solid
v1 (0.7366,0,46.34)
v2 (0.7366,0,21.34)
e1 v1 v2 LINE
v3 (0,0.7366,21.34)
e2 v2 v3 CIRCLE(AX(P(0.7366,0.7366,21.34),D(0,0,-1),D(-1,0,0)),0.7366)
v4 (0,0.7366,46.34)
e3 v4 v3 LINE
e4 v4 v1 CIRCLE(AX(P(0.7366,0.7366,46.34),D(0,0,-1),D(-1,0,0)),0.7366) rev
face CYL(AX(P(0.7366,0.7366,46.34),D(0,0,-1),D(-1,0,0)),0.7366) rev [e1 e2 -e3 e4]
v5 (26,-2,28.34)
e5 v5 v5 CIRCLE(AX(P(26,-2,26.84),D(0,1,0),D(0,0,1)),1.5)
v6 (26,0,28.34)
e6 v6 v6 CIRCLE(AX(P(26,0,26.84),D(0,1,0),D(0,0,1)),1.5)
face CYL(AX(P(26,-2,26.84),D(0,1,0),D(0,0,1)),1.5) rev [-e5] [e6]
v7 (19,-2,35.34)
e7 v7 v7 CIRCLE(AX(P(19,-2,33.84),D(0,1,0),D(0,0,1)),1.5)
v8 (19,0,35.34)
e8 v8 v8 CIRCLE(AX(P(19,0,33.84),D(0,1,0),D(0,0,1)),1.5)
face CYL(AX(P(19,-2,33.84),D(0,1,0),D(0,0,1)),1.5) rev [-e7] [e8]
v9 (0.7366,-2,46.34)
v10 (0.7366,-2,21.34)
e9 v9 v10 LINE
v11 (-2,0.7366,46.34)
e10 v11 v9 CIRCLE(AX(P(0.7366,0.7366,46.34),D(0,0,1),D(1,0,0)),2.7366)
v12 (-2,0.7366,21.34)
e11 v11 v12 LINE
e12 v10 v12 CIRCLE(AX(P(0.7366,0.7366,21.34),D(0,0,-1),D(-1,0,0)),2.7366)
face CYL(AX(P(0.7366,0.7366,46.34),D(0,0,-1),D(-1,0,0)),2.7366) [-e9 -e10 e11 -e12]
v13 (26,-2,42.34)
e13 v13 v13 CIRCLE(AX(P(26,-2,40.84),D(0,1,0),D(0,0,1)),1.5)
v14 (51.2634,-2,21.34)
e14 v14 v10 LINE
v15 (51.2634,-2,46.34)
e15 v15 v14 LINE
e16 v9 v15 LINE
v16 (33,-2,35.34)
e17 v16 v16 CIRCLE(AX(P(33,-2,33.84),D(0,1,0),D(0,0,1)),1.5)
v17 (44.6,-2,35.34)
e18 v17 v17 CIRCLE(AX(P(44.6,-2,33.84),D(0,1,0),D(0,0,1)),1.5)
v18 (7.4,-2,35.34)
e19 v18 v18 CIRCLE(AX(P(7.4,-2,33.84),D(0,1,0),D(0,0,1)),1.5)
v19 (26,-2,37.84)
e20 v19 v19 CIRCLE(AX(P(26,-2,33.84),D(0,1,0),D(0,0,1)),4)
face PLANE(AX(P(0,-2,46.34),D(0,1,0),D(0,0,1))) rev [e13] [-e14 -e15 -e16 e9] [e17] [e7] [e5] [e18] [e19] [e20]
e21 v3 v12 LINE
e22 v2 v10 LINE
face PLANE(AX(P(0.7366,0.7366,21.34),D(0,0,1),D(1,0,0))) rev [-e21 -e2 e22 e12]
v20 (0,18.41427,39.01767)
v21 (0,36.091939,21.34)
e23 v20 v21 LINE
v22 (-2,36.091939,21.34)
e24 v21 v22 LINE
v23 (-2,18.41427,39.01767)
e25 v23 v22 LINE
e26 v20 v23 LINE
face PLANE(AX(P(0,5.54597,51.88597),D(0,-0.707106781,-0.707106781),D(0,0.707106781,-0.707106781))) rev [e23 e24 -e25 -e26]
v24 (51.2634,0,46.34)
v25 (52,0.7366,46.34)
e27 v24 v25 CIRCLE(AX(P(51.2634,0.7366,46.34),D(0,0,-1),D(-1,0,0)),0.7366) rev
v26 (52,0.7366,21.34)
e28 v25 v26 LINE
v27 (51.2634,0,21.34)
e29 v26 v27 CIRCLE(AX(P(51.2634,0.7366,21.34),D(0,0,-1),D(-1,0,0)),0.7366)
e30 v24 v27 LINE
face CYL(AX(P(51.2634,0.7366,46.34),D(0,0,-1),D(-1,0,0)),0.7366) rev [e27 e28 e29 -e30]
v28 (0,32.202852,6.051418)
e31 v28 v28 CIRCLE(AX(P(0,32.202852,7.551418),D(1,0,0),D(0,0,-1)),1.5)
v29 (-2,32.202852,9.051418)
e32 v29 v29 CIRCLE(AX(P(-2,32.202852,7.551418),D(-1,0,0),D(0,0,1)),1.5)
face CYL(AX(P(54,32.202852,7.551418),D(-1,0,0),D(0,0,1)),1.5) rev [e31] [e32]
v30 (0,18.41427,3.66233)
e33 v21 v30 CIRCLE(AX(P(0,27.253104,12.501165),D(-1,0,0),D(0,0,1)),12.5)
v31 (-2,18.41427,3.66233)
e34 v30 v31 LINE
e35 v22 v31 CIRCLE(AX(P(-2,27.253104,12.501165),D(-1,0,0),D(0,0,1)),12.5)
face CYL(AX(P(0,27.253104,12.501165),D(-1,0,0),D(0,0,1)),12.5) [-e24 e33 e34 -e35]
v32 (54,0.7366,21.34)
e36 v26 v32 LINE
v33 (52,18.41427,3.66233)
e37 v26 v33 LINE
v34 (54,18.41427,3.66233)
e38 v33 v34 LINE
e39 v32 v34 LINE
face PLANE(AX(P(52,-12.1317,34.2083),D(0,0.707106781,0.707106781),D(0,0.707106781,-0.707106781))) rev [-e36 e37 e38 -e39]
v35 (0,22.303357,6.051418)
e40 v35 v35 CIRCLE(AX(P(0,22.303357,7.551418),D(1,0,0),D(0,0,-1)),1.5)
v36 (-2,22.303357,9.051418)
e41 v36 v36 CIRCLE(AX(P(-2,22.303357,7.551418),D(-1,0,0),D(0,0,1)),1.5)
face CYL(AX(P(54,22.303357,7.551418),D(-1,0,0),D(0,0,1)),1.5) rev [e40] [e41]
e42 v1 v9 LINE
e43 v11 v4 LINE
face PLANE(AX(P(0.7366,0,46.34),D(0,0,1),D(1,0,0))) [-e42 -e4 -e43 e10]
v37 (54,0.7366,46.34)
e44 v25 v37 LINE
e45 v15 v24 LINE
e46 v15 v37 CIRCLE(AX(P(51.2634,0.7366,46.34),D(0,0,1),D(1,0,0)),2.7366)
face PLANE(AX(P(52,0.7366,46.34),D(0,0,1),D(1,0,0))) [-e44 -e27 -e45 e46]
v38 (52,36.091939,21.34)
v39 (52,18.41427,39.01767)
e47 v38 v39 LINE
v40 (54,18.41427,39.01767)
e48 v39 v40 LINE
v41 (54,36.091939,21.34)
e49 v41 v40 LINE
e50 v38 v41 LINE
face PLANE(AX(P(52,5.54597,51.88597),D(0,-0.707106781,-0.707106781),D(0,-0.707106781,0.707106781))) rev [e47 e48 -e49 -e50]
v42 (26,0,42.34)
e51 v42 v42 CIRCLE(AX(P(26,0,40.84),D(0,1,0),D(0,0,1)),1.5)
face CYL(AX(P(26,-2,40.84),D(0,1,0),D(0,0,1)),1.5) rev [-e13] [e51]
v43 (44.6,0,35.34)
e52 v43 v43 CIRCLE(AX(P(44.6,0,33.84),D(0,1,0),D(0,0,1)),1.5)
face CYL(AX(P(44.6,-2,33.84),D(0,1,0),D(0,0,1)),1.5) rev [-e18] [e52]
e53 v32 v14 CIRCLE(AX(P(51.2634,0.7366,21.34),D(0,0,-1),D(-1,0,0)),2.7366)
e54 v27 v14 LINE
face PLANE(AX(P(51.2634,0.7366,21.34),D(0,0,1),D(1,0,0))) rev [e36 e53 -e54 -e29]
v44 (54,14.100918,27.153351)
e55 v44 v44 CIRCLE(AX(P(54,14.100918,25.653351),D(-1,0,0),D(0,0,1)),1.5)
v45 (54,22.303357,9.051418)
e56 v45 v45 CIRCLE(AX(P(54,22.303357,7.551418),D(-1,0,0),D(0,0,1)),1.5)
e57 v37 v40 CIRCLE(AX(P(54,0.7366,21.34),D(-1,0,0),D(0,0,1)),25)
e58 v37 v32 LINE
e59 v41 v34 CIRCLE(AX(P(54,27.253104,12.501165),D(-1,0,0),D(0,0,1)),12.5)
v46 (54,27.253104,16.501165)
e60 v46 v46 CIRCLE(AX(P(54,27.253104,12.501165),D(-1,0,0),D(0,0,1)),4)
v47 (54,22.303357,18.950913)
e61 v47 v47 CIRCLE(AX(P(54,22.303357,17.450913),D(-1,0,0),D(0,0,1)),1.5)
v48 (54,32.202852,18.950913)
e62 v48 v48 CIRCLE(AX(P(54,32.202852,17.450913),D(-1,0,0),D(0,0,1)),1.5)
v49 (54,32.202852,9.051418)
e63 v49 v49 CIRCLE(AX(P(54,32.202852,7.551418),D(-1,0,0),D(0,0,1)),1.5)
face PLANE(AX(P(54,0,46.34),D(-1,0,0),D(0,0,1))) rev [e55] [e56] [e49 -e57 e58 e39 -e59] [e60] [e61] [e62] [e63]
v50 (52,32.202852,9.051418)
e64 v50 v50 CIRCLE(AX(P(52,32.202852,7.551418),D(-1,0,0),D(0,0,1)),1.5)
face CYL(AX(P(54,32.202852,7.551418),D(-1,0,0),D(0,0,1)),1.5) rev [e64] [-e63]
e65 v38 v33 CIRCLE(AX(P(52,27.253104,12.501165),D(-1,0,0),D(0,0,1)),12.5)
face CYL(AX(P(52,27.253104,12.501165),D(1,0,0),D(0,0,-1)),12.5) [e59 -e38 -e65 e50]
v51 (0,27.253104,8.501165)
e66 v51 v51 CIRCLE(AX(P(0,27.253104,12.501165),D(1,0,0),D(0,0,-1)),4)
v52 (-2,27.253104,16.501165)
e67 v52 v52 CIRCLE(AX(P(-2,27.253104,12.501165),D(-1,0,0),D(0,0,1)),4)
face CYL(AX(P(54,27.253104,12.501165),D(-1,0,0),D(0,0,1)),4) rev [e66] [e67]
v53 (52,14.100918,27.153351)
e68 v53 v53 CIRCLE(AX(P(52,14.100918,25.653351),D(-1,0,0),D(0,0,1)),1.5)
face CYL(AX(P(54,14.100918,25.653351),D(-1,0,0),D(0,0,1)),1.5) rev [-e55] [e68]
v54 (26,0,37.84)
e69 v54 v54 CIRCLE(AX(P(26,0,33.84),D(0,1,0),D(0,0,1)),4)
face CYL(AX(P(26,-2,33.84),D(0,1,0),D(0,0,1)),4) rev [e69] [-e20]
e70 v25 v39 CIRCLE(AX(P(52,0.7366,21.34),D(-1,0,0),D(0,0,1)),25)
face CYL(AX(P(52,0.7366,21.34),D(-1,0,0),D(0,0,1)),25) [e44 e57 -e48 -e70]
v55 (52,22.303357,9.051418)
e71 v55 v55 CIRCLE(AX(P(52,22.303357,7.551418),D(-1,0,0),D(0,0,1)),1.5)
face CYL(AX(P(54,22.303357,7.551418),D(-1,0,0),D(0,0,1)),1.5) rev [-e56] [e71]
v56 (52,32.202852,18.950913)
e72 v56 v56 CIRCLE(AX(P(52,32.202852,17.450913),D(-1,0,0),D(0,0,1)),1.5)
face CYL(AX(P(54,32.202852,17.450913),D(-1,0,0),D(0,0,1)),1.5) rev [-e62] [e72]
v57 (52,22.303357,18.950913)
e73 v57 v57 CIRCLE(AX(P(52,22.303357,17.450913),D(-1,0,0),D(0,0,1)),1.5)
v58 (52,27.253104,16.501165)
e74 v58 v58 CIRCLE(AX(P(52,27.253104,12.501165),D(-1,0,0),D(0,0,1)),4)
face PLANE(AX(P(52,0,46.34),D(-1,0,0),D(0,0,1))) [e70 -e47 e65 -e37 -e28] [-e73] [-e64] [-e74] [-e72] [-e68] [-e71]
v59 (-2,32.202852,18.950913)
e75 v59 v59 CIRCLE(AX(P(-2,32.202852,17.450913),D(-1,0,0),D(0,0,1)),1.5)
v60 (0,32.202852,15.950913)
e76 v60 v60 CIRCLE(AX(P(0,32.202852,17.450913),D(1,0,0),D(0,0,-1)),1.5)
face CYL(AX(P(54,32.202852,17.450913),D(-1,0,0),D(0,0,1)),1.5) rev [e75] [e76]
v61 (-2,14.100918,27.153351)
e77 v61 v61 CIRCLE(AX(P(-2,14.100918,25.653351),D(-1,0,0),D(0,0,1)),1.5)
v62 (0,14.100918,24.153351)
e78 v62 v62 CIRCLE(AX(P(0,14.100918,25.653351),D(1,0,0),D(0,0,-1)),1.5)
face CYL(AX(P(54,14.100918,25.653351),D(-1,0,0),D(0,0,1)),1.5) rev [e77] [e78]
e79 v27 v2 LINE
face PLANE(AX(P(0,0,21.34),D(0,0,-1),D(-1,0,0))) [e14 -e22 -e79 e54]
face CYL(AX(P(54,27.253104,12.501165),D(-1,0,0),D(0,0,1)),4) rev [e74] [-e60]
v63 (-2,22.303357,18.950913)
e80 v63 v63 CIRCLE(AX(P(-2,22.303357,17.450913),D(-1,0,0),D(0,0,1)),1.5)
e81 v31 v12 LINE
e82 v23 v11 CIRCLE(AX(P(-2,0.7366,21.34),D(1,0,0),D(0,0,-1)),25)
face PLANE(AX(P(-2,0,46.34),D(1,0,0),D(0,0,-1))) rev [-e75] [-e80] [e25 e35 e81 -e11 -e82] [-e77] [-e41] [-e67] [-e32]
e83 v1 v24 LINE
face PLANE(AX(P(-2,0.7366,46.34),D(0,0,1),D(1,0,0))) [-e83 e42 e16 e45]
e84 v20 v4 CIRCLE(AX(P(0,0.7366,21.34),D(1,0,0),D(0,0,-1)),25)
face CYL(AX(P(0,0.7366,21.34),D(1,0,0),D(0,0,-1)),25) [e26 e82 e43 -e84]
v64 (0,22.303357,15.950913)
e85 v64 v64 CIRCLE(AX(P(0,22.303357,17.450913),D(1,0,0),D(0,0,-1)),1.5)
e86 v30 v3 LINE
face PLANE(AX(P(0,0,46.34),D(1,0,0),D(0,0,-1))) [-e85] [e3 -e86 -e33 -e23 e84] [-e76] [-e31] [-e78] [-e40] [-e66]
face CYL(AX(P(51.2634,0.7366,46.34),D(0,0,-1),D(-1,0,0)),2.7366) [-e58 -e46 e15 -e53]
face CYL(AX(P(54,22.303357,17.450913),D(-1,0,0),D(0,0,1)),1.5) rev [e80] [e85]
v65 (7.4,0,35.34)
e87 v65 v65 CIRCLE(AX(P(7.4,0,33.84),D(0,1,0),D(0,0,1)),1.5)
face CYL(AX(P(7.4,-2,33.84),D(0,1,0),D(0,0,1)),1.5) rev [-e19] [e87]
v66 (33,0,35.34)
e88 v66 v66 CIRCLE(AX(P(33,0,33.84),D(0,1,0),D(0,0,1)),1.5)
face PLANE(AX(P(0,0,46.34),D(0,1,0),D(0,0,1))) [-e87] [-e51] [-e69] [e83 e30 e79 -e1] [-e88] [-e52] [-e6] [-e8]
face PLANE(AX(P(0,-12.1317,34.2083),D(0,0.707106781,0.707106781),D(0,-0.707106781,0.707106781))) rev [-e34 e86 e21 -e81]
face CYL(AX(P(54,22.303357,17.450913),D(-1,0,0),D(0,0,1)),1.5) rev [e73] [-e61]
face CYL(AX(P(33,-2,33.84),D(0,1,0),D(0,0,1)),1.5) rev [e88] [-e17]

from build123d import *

# Parameters (mm, degrees)
SM_BASE_FLANGE_1_DEPTH   = 46.34
CUT_EXTRUDE_1_DEPTH      = 83.488760446
EXTRUDE_1_DEPTH          = 2
CUT_EXTRUDE_2_DEPTH      = 82.508925285
CUT_EXTRUDE_2_DEPTH_BACK = 82.508925285
SKETCH_9_R               = 4
SKETCH_9_R_2             = 1.5
SKETCH_10_R              = 4
SKETCH_10_R_2            = 1.5
CUT_EXTRUDE_3_DEPTH      = 2


# Sheet-metal steps are written as plain solids
with BuildPart() as part:
    # Sketch 1 → 基体-法兰1 (new body)
    with BuildSketch(Plane.XY):
        with BuildLine():
            Line((0, 39), (0, 0.7366))
            ThreePointArc((0, 0.7366), (0.215745145, 0.215745145), (0.7366, 0))
            Line((0.7366, 0), (51.2634, 0))
            ThreePointArc((51.2634, 0), (51.784254855, 0.215745145), (52, 0.7366))
            Line((52, 0.7366), (52, 39))
            Line((52, 39), (54, 39))
            Line((54, 39), (54, 0.7366))
            ThreePointArc((54, 0.7366), (53.198468417, -1.198468417), (51.2634, -2))
            Line((51.2634, -2), (0.7366, -2))
            ThreePointArc((0.7366, -2), (-1.198468417, -1.198468417), (-2, 0.7366))
            Line((-2, 0.7366), (-2, 39))
            Line((-2, 39), (0, 39))
        make_face()
    extrude(amount=SM_BASE_FLANGE_1_DEPTH)

    # 草图7 → 切除-拉伸1 (cut, through all)
    with BuildSketch(Plane.ZY.offset(2)):
        with BuildLine():
            ThreePointArc((46.34, 0.7366), (44.436988313, 10.303685809), (39.01766953, 18.41426953))
            Line((39.01766953, 18.41426953), (21.34, 36.091939059))
            Line((21.34, 36.091939059), (3.66233047, 18.41426953))
            Line((3.66233047, 18.41426953), (21.34, 0.7366))
            Line((21.34, 0.7366), (21.34, -3.161495831))
            Line((21.34, -3.161495831), (-1.543022836, -3.161495831))
            Line((-1.543022836, -3.161495831), (-1.543022836, 48.54205915))
            Line((-1.543022836, 48.54205915), (49.658153452, 48.54205915))
            Line((49.658153452, 48.54205915), (49.658153452, 0.7366))
            Line((49.658153452, 0.7366), (46.34, 0.7366))
        make_face()
    extrude(amount=-CUT_EXTRUDE_1_DEPTH, mode=Mode.SUBTRACT)

    # 草图8 → 凸台-拉伸1 (add)
    with BuildSketch(Plane.ZY.offset(2)):
        with BuildLine():
            Line((21.34, 36.091939059), (3.66233047, 18.41426953))
            ThreePointArc((3.66233047, 18.41426953), (3.66233047, 36.091939059), (21.34, 36.091939059))
        make_face()
    extrude_1 = extrude(amount=-EXTRUDE_1_DEPTH)

    # 镜向1: 凸台-拉伸1 across plane
    add(extrude_1.mirror(Plane(origin=(26, 0, 0), x_dir=(0, 0, 1), z_dir=(1, 0, 0))))

    # 草图9 → 切除-拉伸2 (cut, two sides: drawn at the far end of the back side and taken through both)
    with BuildSketch(Plane.ZY.offset(-52).offset(-CUT_EXTRUDE_2_DEPTH_BACK)):
        with Locations((12.501165235, 27.253104294)):
            Circle(SKETCH_9_R)
        with Locations((25.653351365, 14.100918164)):
            Circle(SKETCH_9_R_2)
        with Locations((7.551417767, 32.202851763)):
            Circle(SKETCH_9_R_2)
        with Locations((17.450912703, 32.202851763)):
            Circle(SKETCH_9_R_2)
        with Locations((17.450912703, 22.303356826)):
            Circle(SKETCH_9_R_2)
        with Locations((7.551417767, 22.303356826)):
            Circle(SKETCH_9_R_2)
    extrude(amount=CUT_EXTRUDE_2_DEPTH + CUT_EXTRUDE_2_DEPTH_BACK, mode=Mode.SUBTRACT)

    # 草图10 → 切除-拉伸3 (cut)
    with BuildSketch(Plane(origin=(0, 0, 0), x_dir=(1, 0, 0), z_dir=(0, 1, 0))):
        with Locations(Location((26, -33.84, 0), (0, 0, 270))):
            Circle(SKETCH_10_R)
        with Locations(Location((26, -26.84, 0), (0, 0, 270))):
            Circle(SKETCH_10_R_2)
        with Locations(Location((33, -33.84, 0), (0, 0, 270))):
            Circle(SKETCH_10_R_2)
        with Locations(Location((26, -40.84, 0), (0, 0, 270))):
            Circle(SKETCH_10_R_2)
        with Locations(Location((19, -33.84, 0), (0, 0, 270))):
            Circle(SKETCH_10_R_2)
        with Locations(Location((7.4, -33.84, 0), (0, 0, 270))):
            Circle(SKETCH_10_R_2)
        with Locations(Location((44.6, -33.84, 0), (0, 0, 270))):
            Circle(SKETCH_10_R_2)
    extrude(amount=-CUT_EXTRUDE_3_DEPTH, mode=Mode.SUBTRACT)


solid = part.part
